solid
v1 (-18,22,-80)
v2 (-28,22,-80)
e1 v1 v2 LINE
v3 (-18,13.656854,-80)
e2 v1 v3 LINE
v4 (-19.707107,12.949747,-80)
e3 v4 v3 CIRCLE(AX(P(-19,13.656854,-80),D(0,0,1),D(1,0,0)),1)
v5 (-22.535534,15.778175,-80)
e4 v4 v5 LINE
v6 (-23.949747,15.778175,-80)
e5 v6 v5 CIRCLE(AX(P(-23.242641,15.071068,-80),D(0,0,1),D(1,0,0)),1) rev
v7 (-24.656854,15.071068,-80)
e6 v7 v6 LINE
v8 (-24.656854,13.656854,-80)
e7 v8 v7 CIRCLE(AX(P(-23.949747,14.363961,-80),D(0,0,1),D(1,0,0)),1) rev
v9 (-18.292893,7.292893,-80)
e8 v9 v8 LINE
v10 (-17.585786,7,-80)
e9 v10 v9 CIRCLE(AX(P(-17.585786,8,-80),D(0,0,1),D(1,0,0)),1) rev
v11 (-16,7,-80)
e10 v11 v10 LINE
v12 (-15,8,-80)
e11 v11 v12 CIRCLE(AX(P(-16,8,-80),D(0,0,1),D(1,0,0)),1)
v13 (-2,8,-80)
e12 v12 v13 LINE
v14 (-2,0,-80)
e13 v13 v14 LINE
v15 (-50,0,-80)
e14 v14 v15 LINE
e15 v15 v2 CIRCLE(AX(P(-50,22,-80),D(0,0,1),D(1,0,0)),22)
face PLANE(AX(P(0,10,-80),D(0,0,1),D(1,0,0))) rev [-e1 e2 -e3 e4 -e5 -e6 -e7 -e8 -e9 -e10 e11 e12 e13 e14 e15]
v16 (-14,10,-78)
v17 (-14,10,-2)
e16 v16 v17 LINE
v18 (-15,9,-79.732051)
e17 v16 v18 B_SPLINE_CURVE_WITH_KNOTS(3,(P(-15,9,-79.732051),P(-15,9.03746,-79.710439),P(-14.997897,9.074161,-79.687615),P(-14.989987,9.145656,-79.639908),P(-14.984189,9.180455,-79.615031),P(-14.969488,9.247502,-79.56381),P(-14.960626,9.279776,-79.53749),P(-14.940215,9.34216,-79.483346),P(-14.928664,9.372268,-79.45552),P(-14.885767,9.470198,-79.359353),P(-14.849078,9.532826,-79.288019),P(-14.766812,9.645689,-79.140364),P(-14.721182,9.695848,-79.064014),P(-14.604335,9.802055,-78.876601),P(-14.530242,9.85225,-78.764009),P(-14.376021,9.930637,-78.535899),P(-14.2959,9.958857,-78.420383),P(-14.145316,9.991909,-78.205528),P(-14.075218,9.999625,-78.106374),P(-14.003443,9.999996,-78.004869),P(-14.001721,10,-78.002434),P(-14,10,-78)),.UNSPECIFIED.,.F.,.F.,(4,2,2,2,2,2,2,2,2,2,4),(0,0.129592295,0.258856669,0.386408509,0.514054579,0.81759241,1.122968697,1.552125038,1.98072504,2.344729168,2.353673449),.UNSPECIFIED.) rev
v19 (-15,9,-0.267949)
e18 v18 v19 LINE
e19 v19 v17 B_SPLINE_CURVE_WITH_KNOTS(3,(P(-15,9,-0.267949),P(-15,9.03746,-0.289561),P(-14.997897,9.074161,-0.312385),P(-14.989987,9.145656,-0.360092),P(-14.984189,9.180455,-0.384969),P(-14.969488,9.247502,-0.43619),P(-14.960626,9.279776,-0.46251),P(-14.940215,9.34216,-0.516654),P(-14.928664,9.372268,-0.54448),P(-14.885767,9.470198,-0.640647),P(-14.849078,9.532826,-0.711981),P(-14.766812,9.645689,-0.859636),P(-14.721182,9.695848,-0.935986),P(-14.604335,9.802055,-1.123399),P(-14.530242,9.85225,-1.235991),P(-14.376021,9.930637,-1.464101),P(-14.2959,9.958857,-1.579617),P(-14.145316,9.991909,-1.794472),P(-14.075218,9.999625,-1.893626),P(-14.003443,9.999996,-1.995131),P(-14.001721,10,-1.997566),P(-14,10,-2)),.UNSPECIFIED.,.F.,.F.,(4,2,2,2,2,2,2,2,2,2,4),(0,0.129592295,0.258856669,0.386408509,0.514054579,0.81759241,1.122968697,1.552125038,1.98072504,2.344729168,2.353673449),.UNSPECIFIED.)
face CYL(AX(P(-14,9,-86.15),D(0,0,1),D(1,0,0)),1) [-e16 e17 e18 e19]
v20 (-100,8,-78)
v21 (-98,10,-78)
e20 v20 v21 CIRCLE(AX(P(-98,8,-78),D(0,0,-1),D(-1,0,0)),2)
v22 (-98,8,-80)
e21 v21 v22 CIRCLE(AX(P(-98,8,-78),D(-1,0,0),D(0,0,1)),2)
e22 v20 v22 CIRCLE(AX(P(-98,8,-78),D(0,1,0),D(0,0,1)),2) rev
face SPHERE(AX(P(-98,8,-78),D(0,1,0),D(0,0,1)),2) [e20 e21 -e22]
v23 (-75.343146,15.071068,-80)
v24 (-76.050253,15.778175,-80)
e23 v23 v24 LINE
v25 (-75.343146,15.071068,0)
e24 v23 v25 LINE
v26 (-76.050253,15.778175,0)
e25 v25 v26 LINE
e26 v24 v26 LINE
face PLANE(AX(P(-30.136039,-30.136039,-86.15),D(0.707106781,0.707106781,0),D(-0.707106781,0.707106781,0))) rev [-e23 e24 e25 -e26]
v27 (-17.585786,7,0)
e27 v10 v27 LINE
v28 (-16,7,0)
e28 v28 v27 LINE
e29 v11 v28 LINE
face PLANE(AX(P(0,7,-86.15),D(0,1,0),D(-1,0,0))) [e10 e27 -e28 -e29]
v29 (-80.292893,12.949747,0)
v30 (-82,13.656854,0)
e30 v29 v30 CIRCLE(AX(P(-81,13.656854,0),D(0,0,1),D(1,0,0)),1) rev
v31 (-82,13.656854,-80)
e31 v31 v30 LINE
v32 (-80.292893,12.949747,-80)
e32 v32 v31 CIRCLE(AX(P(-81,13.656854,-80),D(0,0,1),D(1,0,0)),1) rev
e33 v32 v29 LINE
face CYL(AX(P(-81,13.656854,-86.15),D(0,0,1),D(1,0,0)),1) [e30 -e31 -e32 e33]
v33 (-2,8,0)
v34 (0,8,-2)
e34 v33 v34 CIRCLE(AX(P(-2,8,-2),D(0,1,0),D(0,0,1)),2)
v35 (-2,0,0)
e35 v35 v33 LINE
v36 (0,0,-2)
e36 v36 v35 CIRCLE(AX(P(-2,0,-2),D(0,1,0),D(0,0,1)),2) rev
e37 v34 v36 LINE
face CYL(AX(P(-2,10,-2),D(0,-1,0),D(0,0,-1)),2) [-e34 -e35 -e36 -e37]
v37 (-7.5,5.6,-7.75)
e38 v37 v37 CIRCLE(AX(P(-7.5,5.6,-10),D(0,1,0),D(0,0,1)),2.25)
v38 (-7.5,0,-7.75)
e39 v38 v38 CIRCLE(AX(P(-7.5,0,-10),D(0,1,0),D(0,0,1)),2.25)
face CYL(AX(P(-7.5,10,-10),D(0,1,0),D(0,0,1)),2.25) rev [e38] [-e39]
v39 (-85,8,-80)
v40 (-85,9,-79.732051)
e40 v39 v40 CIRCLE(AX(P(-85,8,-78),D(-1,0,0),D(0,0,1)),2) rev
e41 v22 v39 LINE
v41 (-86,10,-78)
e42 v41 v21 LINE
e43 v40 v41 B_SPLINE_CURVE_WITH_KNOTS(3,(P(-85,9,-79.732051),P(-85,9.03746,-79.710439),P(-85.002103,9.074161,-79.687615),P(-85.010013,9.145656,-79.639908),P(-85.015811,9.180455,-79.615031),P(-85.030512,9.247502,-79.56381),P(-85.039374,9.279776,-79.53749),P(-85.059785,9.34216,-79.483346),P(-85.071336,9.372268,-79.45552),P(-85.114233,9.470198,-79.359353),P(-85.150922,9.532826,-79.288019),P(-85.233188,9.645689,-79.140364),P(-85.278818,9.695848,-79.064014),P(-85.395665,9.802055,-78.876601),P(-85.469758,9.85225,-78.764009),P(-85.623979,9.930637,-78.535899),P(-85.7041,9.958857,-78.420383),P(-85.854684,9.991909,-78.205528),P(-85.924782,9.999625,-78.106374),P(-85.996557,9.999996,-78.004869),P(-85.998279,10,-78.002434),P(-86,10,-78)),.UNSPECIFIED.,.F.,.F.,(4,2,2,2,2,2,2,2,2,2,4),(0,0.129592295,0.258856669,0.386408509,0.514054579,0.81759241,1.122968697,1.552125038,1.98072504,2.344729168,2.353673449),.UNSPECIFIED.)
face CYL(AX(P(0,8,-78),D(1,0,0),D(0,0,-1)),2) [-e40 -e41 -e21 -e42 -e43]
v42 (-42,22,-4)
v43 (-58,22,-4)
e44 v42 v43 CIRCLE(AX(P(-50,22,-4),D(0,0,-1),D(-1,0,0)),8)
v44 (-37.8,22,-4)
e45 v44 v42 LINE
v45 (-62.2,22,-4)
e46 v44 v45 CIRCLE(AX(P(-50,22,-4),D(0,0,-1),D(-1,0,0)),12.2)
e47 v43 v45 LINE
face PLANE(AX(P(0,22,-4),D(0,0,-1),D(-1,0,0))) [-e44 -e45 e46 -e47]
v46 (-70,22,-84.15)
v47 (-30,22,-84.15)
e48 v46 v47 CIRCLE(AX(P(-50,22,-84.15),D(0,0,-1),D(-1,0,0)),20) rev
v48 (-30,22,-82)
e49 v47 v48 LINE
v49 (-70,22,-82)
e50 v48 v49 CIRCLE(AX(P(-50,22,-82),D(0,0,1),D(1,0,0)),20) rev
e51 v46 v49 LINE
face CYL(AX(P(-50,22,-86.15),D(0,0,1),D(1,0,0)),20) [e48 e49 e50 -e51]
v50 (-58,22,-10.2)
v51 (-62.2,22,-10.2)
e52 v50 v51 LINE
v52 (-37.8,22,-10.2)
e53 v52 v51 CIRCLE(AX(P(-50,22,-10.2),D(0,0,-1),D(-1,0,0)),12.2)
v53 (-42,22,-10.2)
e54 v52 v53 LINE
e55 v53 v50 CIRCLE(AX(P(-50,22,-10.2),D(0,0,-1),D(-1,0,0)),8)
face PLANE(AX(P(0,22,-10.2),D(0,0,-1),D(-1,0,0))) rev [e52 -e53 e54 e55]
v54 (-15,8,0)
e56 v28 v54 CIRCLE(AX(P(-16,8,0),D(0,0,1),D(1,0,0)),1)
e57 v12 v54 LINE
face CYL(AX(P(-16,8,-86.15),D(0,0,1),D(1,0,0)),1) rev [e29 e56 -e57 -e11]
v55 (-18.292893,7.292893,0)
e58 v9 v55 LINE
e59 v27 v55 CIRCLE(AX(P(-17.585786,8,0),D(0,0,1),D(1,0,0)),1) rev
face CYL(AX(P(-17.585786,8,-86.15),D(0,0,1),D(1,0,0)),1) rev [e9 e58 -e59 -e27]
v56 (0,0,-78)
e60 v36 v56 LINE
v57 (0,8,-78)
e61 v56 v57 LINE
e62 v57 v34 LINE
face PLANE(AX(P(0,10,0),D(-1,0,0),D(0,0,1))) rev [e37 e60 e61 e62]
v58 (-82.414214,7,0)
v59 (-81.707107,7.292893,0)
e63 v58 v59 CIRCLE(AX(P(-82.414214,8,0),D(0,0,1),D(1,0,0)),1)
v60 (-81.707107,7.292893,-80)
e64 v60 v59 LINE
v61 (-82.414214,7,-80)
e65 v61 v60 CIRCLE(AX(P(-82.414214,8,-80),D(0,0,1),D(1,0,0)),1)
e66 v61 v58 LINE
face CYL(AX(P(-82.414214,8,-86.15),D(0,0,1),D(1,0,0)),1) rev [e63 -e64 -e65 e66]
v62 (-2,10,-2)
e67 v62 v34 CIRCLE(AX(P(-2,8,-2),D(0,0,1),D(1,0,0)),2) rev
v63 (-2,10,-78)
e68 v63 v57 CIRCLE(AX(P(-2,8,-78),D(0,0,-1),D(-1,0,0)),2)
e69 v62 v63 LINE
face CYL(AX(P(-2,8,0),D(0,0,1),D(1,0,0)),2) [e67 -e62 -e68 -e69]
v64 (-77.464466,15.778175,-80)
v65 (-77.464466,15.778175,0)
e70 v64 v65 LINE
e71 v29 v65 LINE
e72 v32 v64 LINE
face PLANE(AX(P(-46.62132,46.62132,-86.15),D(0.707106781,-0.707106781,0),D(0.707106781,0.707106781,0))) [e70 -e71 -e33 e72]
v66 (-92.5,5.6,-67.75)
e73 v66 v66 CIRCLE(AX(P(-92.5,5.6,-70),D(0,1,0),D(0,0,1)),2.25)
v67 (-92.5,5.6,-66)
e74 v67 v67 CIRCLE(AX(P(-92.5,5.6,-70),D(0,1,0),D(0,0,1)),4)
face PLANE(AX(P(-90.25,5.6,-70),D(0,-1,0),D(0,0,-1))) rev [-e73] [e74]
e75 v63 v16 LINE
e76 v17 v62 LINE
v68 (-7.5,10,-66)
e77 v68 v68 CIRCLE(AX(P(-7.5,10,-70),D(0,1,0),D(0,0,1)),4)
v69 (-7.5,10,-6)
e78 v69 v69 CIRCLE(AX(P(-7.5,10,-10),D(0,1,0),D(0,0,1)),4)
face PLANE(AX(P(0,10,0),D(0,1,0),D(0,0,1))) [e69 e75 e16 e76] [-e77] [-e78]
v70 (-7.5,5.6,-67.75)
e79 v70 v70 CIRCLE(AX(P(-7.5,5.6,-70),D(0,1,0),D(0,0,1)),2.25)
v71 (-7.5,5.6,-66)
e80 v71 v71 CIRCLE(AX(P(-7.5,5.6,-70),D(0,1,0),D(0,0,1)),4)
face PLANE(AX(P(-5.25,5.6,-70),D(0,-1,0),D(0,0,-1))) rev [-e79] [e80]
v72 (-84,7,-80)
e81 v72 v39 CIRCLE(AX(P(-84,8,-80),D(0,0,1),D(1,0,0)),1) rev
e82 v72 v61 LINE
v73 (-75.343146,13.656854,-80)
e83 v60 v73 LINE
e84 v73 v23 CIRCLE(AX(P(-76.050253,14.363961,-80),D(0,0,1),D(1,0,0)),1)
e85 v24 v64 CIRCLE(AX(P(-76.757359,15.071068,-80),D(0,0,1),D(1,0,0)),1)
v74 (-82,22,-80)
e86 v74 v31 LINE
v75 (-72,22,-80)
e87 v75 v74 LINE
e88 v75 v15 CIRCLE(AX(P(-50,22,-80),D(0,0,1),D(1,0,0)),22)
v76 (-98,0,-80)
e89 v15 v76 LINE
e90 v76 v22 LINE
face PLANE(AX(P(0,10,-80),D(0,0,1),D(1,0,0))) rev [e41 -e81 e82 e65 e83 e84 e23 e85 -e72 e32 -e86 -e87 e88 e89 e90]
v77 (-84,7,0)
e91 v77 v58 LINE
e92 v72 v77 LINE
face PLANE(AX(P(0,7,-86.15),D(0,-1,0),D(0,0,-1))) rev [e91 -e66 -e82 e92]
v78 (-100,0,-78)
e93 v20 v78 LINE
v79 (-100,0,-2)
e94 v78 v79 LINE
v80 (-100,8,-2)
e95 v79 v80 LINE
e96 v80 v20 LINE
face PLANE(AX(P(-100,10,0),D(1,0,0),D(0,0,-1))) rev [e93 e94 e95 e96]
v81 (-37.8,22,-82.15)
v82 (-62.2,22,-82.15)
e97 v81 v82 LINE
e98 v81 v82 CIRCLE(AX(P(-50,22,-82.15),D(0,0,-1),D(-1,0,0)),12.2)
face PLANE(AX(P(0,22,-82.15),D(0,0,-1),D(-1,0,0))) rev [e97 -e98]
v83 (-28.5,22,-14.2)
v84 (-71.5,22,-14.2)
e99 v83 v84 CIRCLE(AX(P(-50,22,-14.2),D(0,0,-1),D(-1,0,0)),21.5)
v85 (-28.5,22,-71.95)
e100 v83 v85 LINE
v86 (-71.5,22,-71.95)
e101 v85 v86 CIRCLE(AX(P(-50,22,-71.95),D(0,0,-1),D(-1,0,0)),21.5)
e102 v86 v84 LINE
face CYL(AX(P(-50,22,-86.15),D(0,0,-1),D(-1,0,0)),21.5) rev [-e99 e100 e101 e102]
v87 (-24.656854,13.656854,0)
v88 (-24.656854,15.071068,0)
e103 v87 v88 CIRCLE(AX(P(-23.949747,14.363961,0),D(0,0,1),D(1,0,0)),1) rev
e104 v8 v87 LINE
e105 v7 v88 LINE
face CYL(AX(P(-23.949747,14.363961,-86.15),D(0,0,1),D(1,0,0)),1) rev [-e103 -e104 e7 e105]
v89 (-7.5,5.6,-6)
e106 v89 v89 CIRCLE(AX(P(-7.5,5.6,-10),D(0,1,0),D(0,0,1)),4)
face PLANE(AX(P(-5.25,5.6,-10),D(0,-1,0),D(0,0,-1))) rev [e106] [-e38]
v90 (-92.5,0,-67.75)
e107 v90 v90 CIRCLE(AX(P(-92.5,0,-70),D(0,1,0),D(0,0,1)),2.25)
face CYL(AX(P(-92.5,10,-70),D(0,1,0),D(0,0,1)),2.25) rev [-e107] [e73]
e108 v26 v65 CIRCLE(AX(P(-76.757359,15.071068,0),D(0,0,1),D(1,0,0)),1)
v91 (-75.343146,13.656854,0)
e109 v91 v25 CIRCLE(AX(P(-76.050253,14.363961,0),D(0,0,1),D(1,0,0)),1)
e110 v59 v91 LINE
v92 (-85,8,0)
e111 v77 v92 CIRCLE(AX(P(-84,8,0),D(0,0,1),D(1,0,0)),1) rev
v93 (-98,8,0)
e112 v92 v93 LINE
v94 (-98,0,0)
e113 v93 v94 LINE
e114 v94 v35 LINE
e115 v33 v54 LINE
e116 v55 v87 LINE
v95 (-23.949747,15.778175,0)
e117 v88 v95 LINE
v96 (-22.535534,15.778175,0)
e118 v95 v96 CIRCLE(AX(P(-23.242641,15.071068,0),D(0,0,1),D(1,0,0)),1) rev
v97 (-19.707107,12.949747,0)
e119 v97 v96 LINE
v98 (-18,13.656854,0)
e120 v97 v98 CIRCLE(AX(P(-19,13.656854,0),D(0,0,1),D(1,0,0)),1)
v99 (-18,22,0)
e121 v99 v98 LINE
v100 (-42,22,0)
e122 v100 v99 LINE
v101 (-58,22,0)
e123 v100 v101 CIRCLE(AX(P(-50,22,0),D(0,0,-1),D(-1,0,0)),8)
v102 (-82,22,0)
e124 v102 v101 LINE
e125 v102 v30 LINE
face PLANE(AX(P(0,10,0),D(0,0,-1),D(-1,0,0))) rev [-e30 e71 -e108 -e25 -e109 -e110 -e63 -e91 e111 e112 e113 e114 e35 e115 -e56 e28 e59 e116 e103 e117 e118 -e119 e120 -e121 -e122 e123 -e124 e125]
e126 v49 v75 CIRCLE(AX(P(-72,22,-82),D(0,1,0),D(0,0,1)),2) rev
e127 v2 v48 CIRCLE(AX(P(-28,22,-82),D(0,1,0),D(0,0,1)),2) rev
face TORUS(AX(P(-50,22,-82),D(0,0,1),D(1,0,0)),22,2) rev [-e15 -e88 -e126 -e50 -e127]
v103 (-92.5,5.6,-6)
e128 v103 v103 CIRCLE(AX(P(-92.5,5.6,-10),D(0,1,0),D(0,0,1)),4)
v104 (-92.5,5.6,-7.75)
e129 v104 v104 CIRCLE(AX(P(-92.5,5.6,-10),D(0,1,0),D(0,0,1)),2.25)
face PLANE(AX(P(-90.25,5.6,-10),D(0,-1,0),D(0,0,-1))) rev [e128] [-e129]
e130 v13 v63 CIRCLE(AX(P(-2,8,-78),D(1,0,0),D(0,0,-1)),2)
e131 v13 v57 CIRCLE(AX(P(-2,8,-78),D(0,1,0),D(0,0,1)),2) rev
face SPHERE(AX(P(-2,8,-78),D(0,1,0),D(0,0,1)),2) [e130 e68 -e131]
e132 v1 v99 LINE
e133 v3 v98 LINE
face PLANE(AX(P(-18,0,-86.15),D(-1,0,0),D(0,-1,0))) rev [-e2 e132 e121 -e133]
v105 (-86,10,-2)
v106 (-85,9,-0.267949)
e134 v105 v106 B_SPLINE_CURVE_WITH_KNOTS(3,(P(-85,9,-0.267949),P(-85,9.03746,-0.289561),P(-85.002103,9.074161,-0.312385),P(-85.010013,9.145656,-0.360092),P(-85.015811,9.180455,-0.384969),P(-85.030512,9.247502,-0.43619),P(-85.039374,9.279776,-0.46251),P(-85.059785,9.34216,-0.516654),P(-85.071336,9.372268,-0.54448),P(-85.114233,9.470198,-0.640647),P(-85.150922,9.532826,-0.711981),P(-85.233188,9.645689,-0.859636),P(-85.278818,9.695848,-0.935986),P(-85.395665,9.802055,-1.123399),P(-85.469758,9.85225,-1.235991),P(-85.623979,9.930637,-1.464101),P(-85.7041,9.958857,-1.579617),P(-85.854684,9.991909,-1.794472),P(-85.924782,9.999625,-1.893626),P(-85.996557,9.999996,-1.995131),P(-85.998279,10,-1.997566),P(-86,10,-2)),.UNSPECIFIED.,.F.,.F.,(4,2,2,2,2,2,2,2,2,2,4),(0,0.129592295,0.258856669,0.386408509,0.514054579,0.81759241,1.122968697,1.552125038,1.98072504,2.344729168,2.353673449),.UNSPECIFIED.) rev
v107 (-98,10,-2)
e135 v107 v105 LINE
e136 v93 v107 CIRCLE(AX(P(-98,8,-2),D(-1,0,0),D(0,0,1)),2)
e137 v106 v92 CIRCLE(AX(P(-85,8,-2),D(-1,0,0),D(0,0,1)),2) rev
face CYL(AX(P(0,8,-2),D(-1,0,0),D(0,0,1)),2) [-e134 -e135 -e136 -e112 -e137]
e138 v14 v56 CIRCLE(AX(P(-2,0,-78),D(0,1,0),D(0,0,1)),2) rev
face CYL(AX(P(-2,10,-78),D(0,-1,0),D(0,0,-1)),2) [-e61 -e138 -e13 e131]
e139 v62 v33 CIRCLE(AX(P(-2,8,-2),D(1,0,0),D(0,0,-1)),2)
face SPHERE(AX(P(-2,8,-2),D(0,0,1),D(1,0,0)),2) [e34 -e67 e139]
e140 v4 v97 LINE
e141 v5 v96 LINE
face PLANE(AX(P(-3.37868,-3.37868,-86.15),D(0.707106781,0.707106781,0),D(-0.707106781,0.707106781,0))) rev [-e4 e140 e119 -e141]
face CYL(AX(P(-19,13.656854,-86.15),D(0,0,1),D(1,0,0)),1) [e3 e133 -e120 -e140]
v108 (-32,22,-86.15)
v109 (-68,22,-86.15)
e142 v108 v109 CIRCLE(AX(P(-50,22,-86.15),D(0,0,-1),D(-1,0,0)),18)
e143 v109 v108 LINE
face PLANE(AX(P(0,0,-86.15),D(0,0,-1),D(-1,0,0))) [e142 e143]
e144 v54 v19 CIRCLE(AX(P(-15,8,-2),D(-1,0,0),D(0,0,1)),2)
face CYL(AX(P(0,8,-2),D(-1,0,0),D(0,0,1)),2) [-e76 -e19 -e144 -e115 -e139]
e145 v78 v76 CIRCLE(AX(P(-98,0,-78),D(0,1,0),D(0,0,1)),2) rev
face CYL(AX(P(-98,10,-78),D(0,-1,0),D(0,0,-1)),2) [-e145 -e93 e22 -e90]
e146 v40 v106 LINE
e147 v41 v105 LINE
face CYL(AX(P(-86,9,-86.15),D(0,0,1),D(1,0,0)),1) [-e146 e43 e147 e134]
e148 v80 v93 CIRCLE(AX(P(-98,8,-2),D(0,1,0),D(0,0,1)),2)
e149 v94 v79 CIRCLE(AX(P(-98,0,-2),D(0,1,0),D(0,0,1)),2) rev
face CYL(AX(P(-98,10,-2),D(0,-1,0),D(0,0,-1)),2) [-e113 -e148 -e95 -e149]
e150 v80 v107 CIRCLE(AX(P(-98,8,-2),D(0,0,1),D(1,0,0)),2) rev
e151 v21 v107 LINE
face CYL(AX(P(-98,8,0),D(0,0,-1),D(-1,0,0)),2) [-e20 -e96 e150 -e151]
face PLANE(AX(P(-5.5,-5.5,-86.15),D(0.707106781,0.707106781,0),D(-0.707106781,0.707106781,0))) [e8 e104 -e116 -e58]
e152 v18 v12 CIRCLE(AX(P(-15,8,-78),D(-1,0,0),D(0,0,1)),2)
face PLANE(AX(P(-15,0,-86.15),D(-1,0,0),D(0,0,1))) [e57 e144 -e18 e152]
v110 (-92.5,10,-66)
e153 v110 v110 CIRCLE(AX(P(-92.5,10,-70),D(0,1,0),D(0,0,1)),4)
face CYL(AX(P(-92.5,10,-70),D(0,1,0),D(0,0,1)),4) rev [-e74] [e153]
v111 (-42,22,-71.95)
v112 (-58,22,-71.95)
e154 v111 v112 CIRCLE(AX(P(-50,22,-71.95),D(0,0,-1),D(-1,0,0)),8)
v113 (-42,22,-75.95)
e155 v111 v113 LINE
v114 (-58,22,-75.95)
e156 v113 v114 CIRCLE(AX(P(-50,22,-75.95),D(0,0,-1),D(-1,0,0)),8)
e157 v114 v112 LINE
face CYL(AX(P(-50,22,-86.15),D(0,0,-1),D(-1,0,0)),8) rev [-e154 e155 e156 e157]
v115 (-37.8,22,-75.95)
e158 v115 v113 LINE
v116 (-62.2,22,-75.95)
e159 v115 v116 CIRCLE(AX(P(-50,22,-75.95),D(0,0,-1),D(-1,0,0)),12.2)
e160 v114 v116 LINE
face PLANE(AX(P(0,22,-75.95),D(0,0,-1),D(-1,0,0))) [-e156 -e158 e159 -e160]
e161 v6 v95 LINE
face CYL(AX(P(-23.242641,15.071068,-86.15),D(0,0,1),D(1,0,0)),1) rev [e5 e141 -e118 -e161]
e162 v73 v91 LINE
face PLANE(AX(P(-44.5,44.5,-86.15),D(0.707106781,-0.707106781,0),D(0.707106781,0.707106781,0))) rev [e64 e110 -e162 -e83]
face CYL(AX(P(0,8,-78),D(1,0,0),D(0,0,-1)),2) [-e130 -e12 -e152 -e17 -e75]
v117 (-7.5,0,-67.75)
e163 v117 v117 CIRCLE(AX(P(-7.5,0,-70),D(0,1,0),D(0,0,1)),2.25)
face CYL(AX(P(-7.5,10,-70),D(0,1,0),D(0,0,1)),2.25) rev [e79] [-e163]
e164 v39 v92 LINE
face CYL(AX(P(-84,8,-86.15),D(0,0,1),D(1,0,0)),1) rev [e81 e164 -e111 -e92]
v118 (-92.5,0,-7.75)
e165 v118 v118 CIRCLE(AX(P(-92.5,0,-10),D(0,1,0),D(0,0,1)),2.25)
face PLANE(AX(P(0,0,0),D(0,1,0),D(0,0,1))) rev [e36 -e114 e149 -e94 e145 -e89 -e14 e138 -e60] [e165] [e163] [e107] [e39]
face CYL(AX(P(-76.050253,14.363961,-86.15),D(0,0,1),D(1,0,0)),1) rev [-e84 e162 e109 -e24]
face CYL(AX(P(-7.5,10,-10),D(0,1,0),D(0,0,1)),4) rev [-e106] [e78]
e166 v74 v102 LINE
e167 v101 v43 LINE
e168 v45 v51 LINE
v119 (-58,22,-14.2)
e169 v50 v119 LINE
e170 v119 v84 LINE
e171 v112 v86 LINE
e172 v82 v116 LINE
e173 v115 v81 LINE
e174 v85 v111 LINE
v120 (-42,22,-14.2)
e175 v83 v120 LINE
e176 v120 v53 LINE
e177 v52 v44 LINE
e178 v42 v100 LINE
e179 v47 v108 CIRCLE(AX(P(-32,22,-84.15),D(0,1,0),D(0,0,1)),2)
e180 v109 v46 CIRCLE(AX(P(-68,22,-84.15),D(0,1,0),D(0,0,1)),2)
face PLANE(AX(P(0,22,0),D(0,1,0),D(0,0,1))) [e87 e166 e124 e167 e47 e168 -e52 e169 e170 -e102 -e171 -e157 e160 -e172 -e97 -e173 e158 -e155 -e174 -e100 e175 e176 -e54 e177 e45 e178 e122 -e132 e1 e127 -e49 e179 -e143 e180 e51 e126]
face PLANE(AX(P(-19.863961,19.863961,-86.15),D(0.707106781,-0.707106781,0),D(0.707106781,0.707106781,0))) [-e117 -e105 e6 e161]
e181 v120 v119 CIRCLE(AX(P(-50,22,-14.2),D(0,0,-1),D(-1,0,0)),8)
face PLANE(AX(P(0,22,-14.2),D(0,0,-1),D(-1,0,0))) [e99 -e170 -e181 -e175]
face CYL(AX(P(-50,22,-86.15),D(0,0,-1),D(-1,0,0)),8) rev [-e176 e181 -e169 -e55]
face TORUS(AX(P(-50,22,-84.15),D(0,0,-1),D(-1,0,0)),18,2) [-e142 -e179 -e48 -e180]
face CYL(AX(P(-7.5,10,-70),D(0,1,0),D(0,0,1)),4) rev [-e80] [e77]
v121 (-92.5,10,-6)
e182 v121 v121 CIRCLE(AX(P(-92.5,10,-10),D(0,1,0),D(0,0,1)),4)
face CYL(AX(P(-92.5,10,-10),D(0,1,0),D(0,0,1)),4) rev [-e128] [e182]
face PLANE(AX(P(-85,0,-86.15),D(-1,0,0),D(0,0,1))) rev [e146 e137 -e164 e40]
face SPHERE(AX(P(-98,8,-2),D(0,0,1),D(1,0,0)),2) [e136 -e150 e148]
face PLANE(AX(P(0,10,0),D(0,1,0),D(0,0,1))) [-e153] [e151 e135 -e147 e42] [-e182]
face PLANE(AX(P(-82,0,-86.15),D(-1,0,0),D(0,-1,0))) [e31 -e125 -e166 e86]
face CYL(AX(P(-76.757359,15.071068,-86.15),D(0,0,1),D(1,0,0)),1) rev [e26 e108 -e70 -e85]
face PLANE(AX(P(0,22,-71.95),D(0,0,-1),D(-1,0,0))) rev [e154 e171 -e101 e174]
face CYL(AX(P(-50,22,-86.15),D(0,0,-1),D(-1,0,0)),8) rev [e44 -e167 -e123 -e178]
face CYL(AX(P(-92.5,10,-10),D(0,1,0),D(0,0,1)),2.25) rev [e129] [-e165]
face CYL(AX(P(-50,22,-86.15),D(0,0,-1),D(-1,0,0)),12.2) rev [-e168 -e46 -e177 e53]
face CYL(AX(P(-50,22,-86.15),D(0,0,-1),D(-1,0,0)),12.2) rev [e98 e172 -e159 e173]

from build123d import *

# Parameters (mm, degrees)
ESQUISSE1_W                                       = 100
ESQUISSE1_H                                       = 80
BOSS_EXTRU_1_DEPTH                                = 10
ESQUISSE2_W                                       = 70
ESQUISSE2_H                                       = 80
BOSS_EXTRU_2_DEPTH                                = 12
BOSS_EXTRU_3_DEPTH                                = 6.15
ESQUISSE3_W                                       = 8
ESQUISSE3_H                                       = 4
CHAMBRAGE_POUR_VIS_SIX_PANS_CREUX_M41_D           = 4.5
CHAMBRAGE_POUR_VIS_SIX_PANS_CREUX_M41_CBORE_D     = 8
CHAMBRAGE_POUR_VIS_SIX_PANS_CREUX_M41_CBORE_DEPTH = 4.4
ENL_V_MAT_EXTRU_1_DEPTH                           = 134.812639538
CONG_1_R                                          = 2


with BuildPart() as part:
    # Esquisse1 → Boss.-Extru.1 (new body)
    with BuildSketch(Plane(origin=(0, 0, 0), x_dir=(1, 0, 0), z_dir=(0, 1, 0))):
        with Locations((-50, 40)):
            Rectangle(ESQUISSE1_W, ESQUISSE1_H)
    extrude(amount=BOSS_EXTRU_1_DEPTH)

    # Esquisse2 → Boss.-Extru.2 (add)
    with BuildSketch(Plane(origin=(0, 10, 0), x_dir=(1, 0, 0), z_dir=(0, 1, 0))):
        with Locations((-50, 40)):
            Rectangle(ESQUISSE2_W, ESQUISSE2_H)
    extrude(amount=BOSS_EXTRU_2_DEPTH)

    # Esquisse7 → Boss.-Extru.3 (add)
    with BuildSketch(Plane(origin=(0, 0, -80), x_dir=(-1, 0, 0), z_dir=(0, 0, -1))):
        with BuildLine():
            Line((70, 22), (30, 22))
            ThreePointArc((30, 22), (50, 2), (70, 22))
        make_face()
    extrude(amount=BOSS_EXTRU_3_DEPTH)

    # Esquisse3 → Enlèvement de matière-Révolution1 (revolve, cut)
    with BuildSketch(Plane(origin=(0, 22, 0), x_dir=(1, 0, 0), z_dir=(0, 1, 0))):
        Polygon((-37.8, 82.15), (-50, 82.15), (-50, 75.95), (-42, 75.95), (-37.8, 75.95), align=None)
        with Locations((-46, 73.95)):
            Rectangle(ESQUISSE3_W, ESQUISSE3_H)
        Polygon((-42, 71.95), (-50, 71.95), (-50, 14.2), (-42, 14.2), (-28.5, 14.2), (-28.5, 71.95), align=None)
        with Locations((-46, 12.2)):
            Rectangle(ESQUISSE3_W, ESQUISSE3_H)
        Polygon((-42, 10.2), (-50, 10.2), (-50, 4), (-42, 4), (-37.8, 4), (-37.8, 10.2), align=None)
        with Locations((-46, 2)):
            Rectangle(ESQUISSE3_W, ESQUISSE3_H)
    revolve(axis=Axis((-50, 22, -86.15), (0, 0, 1)), mode=Mode.SUBTRACT)

    # Chambrage pour vis à six pans creux M41 (through all)
    with Locations(Plane(origin=(-92.5, 10, -70), x_dir=(0, 0, 1), z_dir=(0, 1, 0))):
        with Locations((0, 0), (60, 0), (60, 85), (0, 85)):
            CounterBoreHole(CHAMBRAGE_POUR_VIS_SIX_PANS_CREUX_M41_D / 2, CHAMBRAGE_POUR_VIS_SIX_PANS_CREUX_M41_CBORE_D / 2, CHAMBRAGE_POUR_VIS_SIX_PANS_CREUX_M41_CBORE_DEPTH)

    # Esquisse6 → Enlèv. mat.-Extru.1 (cut, through all)
    with BuildSketch(Plane.XY):
        with BuildLine():
            Line((-15, 22), (-18, 22))
            Line((-18, 22), (-18, 13.656854249))
            ThreePointArc((-18, 13.656854249), (-18.617316568, 12.732974717), (-19.707106781, 12.949747468))
            Line((-19.707106781, 12.949747468), (-22.535533906, 15.778174593))
            ThreePointArc((-22.535533906, 15.778174593), (-23.242640687, 16.071067812), (-23.949747468, 15.778174593))
            Line((-23.949747468, 15.778174593), (-24.656854249, 15.071067812))
            ThreePointArc((-24.656854249, 15.071067812), (-24.949747468, 14.363961031), (-24.656854249, 13.656854249))
            Line((-24.656854249, 13.656854249), (-18.292893219, 7.292893219))
            ThreePointArc((-18.292893219, 7.292893219), (-17.96846987, 7.076120467), (-17.585786438, 7))
            Line((-17.585786438, 7), (-16, 7))
            ThreePointArc((-16, 7), (-15.292893219, 7.292893219), (-15, 8))
            Line((-15, 8), (-15, 9))
            ThreePointArc((-15, 9), (-14.707106781, 9.707106781), (-14, 10))
            Line((-14, 10), (-15, 10))
            Line((-15, 10), (-15, 22))
        make_face()
        with BuildLine():
            Line((-82, 13.656854249), (-82, 22))
            Line((-82, 22), (-85, 22))
            Line((-85, 22), (-85, 10))
            Line((-85, 10), (-86, 10))
            ThreePointArc((-86, 10), (-85.292893219, 9.707106781), (-85, 9))
            Line((-85, 9), (-85, 8))
            ThreePointArc((-85, 8), (-84.707106781, 7.292893219), (-84, 7))
            Line((-84, 7), (-82.414213562, 7))
            ThreePointArc((-82.414213562, 7), (-82.03153013, 7.076120467), (-81.707106781, 7.292893219))
            Line((-81.707106781, 7.292893219), (-75.343145751, 13.656854249))
            ThreePointArc((-75.343145751, 13.656854249), (-75.050252532, 14.363961031), (-75.343145751, 15.071067812))
            Line((-75.343145751, 15.071067812), (-76.050252532, 15.778174593))
            ThreePointArc((-76.050252532, 15.778174593), (-76.757359313, 16.071067812), (-77.464466094, 15.778174593))
            Line((-77.464466094, 15.778174593), (-80.292893219, 12.949747468))
            ThreePointArc((-80.292893219, 12.949747468), (-81.382683432, 12.732974717), (-82, 13.656854249))
        make_face()
    extrude(amount=-ENL_V_MAT_EXTRU_1_DEPTH, mode=Mode.SUBTRACT)

    # Congé1
    # the kernel refuses this fillet: 2 mm, written as the material it adds along each edge
    with BuildSketch(Plane(origin=(-50, 22, -80), x_dir=(1, 0, 0), z_dir=(0, 1, 0))) as cong_1_piece_1:
        with BuildLine():
            CenterArc((20 + CONG_1_R, CONG_1_R), CONG_1_R, 180, 90)
            Line((20, CONG_1_R), (20, 0))
            Line((20, 0), (20 + CONG_1_R, 0))
        make_face()
    revolve(axis=Axis((-50, 22, -80), (0, 0, -1)), revolution_arc=180)
    # the kernel refuses this fillet: 2 mm, written as the material it takes off along each edge
    with BuildSketch(Plane(origin=(-2, 8, -78), x_dir=(0, 1, 0), z_dir=(0, 0, -1))) as cong_1_2_piece_1_section:
        Polygon((0, 0), (CONG_1_R * 1.02, 0), (CONG_1_R * 1.02, CONG_1_R * 1.02), (0, CONG_1_R * 1.02), align=None)
    cong_1_2_piece_1 = extrude(amount=CONG_1_R * 1.02, mode=Mode.PRIVATE)
    cong_1_2_piece_1 = cong_1_2_piece_1 - Plane(origin=(-2, 8, -78), x_dir=(-0.7071067811865475, -0.7071067811865475, 0), z_dir=(0, 0, -1)) * Sphere(CONG_1_R, mode=Mode.PRIVATE)
    add(cong_1_2_piece_1, mode=Mode.SUBTRACT)
    with BuildSketch(Plane(origin=(-98, 8, -78), x_dir=(-1, 0, 0), z_dir=(0, 0, -1))) as cong_1_2_piece_2_section:
        Polygon((0, 0), (CONG_1_R * 1.02, 0), (CONG_1_R * 1.02, CONG_1_R * 1.02), (0, CONG_1_R * 1.02), align=None)
    cong_1_2_piece_2 = extrude(amount=CONG_1_R * 1.02, mode=Mode.PRIVATE)
    cong_1_2_piece_2 = cong_1_2_piece_2 - Plane(origin=(-98, 8, -78), x_dir=(0.7071067811865475, -0.7071067811865475, 0), z_dir=(0, 0, -1)) * Sphere(CONG_1_R, mode=Mode.PRIVATE)
    add(cong_1_2_piece_2, mode=Mode.SUBTRACT)
    with BuildSketch(Plane(origin=(-2, 8, -2), x_dir=(0, 1, 0), z_dir=(0, 0, 1))) as cong_1_2_piece_3_section:
        Polygon((0, 0), (CONG_1_R * 1.02, 0), (CONG_1_R * 1.02, -CONG_1_R * 1.02), (0, -CONG_1_R * 1.02), align=None)
    cong_1_2_piece_3 = extrude(amount=CONG_1_R * 1.02, mode=Mode.PRIVATE)
    cong_1_2_piece_3 = cong_1_2_piece_3 - Plane(origin=(-2, 8, -2), x_dir=(-0.7071067811865475, -0.7071067811865475, 0), z_dir=(0, 0, 1)) * Sphere(CONG_1_R, mode=Mode.PRIVATE)
    add(cong_1_2_piece_3, mode=Mode.SUBTRACT)
    with BuildSketch(Plane(origin=(-98, 8, -2), x_dir=(-1, 0, 0), z_dir=(0, 0, 1))) as cong_1_2_piece_4_section:
        Polygon((0, 0), (CONG_1_R * 1.02, 0), (CONG_1_R * 1.02, -CONG_1_R * 1.02), (0, -CONG_1_R * 1.02), align=None)
    cong_1_2_piece_4 = extrude(amount=CONG_1_R * 1.02, mode=Mode.PRIVATE)
    cong_1_2_piece_4 = cong_1_2_piece_4 - Plane(origin=(-98, 8, -2), x_dir=(0.7071067811865475, -0.7071067811865475, 0), z_dir=(0, 0, 1)) * Sphere(CONG_1_R, mode=Mode.PRIVATE)
    add(cong_1_2_piece_4, mode=Mode.SUBTRACT)
    with BuildSketch(Plane(origin=(0, -5, -80), x_dir=(0, 0, 1), z_dir=(0, 1, 0)), Plane(origin=(0, -5, 0), x_dir=(-1, 0, 0), z_dir=(0, 1, 0))) as cong_1_2_piece_5:
        with BuildLine():
            CenterArc((CONG_1_R, -CONG_1_R), CONG_1_R, 90, 90)
            Line((0, -CONG_1_R), (0, 0))
            Line((0, 0), (CONG_1_R, 0))
        make_face()
    extrude(amount=13, mode=Mode.SUBTRACT)
    with BuildSketch(Plane(origin=(-100, -5, -80), x_dir=(0, 0, 1), z_dir=(0, 1, 0)), Plane(origin=(-100, -5, 0), x_dir=(1, 0, 0), z_dir=(0, 1, 0))) as cong_1_2_piece_6:
        with BuildLine():
            CenterArc((CONG_1_R, CONG_1_R), CONG_1_R, 180, 90)
            Line((0, CONG_1_R), (0, 0))
            Line((0, 0), (CONG_1_R, 0))
        make_face()
    extrude(amount=13, mode=Mode.SUBTRACT)
    with BuildSketch(Plane(origin=(0, 10, -78), x_dir=(-1, 0, 0), z_dir=(0, 0, 1))) as cong_1_2_piece_7:
        with BuildLine():
            CenterArc((CONG_1_R, CONG_1_R), CONG_1_R, 180, 90)
            Line((0, CONG_1_R), (0, 0))
            Line((0, 0), (CONG_1_R, 0))
        make_face()
    extrude(amount=76, mode=Mode.SUBTRACT)
    with BuildSketch(Plane(origin=(-2, 10, 0), x_dir=(0, -1, 0), z_dir=(-1, 0, 0)), Plane(origin=(-81, 10, 0), x_dir=(0, -1, 0), z_dir=(-1, 0, 0))) as cong_1_2_piece_8:
        with BuildLine():
            CenterArc((CONG_1_R, -CONG_1_R), CONG_1_R, 90, 90)
            Line((0, -CONG_1_R), (0, 0))
            Line((0, 0), (CONG_1_R, 0))
        make_face()
    extrude(amount=17, mode=Mode.SUBTRACT)
    with BuildSketch(Plane(origin=(-100, 10, -2), x_dir=(0, -1, 0), z_dir=(0, 0, -1))) as cong_1_2_piece_9:
        with BuildLine():
            CenterArc((CONG_1_R, -CONG_1_R), CONG_1_R, 90, 90)
            Line((0, -CONG_1_R), (0, 0))
            Line((0, 0), (CONG_1_R, 0))
        make_face()
    extrude(amount=76, mode=Mode.SUBTRACT)
    with BuildSketch(Plane(origin=(-19, 10, -80), x_dir=(0, 0, 1), z_dir=(1, 0, 0)), Plane(origin=(-98, 10, -80), x_dir=(0, 0, 1), z_dir=(1, 0, 0))) as cong_1_2_piece_10:
        with BuildLine():
            CenterArc((CONG_1_R, CONG_1_R), CONG_1_R, 180, 90)
            Line((0, CONG_1_R), (0, 0))
            Line((0, 0), (CONG_1_R, 0))
        make_face()
    extrude(amount=17, mode=Mode.SUBTRACT)
    with BuildSketch(Plane(origin=(-50, 22, -86.15), x_dir=(0.9688128753181994, 0.24779348784357297, 0), z_dir=(-0.24779348784357297, 0.9688128753181994, 0))) as cong_1_2_piece_11:
        with BuildLine():
            CenterArc((20 - CONG_1_R, -CONG_1_R), CONG_1_R, 0, 90)
            Line((20 - CONG_1_R, 0), (20, 0))
            Line((20, 0), (20, -CONG_1_R))
        make_face()
    revolve(axis=Axis((-50, 22, -86.15), (0, 0, -1)), revolution_arc=208.69396098, mode=Mode.SUBTRACT)


solid = part.part
